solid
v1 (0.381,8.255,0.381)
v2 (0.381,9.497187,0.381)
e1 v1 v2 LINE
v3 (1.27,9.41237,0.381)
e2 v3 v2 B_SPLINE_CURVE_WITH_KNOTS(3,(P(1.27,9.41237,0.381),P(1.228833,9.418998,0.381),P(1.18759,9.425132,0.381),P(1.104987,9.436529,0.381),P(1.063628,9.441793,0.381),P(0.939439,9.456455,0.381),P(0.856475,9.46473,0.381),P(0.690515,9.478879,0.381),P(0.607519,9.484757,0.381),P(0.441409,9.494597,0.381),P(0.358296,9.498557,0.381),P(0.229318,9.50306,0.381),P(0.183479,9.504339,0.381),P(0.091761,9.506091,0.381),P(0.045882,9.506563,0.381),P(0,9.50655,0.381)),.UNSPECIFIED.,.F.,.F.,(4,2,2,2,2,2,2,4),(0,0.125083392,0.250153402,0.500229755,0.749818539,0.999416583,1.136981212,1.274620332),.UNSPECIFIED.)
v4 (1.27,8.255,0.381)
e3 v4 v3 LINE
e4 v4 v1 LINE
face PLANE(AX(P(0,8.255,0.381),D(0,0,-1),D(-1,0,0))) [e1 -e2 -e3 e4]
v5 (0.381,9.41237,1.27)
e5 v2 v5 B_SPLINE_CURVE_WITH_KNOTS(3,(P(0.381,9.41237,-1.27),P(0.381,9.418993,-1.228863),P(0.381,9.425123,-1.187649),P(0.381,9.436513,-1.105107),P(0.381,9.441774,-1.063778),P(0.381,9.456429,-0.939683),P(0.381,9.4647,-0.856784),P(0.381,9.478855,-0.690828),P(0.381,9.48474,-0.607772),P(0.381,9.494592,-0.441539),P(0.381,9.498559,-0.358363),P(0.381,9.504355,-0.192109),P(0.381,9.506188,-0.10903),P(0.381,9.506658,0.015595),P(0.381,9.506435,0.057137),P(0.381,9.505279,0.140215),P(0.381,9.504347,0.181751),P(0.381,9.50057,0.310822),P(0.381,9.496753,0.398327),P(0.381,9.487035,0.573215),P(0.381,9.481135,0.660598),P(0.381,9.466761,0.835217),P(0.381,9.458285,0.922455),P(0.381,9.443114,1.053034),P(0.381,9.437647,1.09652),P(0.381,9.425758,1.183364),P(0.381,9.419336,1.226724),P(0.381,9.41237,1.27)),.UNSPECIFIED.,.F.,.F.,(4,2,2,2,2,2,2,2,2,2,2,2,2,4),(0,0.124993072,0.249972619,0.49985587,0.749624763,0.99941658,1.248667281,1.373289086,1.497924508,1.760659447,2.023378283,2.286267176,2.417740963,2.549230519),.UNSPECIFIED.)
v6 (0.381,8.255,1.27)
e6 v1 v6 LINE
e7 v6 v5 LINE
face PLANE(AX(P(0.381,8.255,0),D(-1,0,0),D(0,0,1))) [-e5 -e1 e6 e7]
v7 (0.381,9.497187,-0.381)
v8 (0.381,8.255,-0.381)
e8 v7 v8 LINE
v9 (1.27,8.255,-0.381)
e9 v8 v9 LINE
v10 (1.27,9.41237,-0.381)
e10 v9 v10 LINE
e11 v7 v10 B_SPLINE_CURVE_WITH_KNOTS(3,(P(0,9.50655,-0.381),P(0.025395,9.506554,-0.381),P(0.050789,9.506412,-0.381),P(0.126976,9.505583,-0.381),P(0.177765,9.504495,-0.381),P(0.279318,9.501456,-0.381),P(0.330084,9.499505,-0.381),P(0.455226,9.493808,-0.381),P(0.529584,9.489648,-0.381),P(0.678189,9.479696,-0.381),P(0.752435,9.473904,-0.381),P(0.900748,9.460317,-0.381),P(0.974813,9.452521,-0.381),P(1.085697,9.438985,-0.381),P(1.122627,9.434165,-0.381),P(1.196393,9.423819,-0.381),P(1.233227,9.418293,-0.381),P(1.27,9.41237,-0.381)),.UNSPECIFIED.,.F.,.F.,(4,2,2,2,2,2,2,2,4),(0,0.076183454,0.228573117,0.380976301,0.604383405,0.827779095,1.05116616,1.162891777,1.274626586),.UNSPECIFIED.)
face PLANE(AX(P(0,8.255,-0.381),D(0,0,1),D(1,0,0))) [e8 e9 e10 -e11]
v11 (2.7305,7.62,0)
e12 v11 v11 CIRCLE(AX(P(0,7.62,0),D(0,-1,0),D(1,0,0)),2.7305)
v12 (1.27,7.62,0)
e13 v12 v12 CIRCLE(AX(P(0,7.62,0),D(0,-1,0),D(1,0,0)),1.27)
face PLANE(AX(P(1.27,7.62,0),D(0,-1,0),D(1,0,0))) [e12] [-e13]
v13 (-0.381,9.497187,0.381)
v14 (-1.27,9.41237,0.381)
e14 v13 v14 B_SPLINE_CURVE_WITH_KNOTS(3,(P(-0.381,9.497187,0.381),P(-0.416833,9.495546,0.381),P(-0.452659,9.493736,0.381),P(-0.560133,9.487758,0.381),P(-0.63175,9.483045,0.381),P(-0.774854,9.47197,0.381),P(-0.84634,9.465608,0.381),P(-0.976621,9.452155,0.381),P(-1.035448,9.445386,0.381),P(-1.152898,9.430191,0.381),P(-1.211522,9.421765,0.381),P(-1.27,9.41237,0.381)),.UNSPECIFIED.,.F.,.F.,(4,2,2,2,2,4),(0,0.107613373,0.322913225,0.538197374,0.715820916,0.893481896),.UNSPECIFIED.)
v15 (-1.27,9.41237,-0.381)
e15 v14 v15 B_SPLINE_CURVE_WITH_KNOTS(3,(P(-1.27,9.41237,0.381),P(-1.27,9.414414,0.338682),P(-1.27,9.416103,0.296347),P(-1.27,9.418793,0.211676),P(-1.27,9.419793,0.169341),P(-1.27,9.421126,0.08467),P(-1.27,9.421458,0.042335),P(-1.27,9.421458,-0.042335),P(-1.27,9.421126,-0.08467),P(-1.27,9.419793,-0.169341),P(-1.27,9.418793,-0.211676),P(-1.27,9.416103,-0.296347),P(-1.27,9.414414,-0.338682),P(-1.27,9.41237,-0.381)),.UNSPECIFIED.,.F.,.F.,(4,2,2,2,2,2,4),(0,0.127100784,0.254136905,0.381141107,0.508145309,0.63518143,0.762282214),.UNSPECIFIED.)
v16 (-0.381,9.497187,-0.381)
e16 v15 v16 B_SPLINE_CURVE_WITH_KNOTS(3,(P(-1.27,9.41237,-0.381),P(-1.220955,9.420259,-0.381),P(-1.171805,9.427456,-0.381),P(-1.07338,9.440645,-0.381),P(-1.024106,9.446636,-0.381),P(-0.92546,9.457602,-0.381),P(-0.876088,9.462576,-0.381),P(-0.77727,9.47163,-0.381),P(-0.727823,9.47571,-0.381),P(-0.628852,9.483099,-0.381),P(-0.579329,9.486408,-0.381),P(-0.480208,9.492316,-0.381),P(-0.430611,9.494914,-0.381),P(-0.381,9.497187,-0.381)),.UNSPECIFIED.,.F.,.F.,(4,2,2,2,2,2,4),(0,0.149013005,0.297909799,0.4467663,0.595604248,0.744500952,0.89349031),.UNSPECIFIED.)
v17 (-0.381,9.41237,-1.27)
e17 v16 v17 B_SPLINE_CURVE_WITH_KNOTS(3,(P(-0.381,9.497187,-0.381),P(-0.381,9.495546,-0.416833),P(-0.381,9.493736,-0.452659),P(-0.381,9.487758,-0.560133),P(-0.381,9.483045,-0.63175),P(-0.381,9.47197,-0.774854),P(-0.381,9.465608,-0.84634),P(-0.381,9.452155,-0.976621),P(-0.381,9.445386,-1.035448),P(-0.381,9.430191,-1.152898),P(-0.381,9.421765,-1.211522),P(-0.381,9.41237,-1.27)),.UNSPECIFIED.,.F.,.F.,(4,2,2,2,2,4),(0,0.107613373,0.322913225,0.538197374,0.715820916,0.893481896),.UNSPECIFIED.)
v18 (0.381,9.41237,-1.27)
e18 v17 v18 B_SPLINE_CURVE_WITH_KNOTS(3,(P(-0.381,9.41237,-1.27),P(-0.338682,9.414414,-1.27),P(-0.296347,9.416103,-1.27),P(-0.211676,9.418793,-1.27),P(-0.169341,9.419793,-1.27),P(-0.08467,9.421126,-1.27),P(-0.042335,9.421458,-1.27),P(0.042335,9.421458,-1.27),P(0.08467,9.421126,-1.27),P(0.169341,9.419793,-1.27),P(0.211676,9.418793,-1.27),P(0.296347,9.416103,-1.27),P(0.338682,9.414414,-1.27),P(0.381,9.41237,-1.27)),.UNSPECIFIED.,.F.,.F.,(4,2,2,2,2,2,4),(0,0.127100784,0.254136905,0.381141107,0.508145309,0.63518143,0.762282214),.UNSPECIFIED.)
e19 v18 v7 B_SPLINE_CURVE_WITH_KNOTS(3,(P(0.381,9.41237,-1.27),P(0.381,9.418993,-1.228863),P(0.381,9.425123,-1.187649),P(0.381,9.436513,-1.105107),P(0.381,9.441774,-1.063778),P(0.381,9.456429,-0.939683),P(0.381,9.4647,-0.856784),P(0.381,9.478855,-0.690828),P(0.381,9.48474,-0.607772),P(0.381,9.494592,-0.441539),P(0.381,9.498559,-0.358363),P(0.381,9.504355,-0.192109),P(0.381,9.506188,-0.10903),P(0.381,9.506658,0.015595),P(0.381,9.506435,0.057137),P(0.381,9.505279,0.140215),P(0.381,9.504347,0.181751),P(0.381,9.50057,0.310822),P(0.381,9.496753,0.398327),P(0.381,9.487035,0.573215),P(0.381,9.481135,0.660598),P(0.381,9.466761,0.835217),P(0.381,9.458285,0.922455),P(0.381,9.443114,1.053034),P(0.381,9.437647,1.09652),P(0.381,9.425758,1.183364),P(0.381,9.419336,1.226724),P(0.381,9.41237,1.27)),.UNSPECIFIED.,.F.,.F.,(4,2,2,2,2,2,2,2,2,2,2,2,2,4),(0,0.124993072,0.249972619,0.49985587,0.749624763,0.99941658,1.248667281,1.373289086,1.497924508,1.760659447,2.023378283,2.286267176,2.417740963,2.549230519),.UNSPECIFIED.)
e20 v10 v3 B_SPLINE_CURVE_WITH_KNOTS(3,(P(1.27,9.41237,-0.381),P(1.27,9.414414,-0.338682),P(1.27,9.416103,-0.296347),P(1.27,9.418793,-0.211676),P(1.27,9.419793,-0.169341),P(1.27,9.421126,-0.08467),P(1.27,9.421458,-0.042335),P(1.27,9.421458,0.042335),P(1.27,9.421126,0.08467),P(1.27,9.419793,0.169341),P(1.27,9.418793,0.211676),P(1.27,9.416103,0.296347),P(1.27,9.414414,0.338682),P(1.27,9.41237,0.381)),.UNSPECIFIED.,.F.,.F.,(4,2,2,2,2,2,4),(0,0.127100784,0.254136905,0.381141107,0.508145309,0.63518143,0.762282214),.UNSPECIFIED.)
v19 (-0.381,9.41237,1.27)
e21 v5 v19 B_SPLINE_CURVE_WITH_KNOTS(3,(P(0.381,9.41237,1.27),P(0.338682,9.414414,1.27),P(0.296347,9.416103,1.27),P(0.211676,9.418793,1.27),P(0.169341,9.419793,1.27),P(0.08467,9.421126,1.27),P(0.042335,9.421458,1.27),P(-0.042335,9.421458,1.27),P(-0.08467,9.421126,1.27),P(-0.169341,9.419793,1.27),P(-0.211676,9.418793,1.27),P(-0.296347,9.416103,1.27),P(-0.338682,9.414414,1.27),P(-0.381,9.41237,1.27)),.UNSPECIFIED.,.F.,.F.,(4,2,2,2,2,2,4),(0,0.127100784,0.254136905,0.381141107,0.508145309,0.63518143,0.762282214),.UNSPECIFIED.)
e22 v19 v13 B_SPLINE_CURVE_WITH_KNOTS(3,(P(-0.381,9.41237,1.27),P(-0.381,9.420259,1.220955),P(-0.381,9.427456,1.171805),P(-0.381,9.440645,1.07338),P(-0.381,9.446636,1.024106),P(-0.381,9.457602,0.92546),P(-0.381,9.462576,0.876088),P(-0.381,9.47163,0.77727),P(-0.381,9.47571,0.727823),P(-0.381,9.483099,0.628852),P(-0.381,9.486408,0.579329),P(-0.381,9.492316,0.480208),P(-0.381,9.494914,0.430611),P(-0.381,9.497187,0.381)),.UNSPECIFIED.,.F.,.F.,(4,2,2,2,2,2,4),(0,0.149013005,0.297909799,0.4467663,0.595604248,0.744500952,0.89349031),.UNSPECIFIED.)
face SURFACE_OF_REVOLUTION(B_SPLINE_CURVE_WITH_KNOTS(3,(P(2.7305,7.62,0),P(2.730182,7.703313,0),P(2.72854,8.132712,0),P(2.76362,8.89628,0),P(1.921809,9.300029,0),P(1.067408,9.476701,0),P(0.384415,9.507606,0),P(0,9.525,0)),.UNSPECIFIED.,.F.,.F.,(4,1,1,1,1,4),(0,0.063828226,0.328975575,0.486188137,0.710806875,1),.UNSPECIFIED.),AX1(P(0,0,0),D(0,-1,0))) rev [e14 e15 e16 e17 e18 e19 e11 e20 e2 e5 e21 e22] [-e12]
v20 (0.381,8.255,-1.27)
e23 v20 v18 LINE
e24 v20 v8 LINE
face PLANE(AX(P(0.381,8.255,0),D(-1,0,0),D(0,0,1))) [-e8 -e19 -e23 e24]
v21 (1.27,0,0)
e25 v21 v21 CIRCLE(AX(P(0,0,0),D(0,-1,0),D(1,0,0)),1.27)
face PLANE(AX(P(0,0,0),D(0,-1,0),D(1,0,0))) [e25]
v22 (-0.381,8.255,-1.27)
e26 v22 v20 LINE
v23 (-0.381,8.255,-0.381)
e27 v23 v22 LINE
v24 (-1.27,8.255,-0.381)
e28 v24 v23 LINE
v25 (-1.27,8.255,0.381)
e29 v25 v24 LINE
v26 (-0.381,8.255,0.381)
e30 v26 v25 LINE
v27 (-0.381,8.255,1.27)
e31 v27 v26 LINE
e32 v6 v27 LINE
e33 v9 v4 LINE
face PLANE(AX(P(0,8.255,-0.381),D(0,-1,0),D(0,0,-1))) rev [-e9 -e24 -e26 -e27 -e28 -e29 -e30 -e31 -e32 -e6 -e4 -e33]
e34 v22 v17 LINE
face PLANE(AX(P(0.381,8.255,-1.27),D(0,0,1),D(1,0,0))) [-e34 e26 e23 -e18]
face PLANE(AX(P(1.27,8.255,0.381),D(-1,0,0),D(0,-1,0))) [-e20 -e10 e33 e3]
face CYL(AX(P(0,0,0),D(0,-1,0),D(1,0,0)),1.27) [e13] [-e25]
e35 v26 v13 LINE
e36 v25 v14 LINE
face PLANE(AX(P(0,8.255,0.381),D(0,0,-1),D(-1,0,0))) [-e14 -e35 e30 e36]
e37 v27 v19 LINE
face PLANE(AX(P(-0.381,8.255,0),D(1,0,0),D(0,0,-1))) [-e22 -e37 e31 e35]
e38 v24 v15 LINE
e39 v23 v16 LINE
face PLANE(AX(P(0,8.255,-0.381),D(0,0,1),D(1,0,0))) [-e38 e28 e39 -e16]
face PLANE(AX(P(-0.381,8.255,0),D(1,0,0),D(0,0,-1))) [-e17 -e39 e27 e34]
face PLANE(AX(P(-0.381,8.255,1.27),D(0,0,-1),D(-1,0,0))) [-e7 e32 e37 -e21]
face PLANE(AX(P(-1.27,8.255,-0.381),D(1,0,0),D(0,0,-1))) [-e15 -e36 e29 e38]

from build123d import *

# Parameters (mm, degrees)
REVOLVE1_OUTLINE_W = 1.27
REVOLVE1_OUTLINE_H = 7.62
SKETCH2_W          = 1.27
SKETCH2_H          = 0.762
CUT_EXTRUDE1_DEPTH = 1.27
CIRPATTERN1_COUNT  = 4


# Read off the part's stored shape, not the designer's step: Revolve1
with BuildPart() as part:
    # Revolve1 outline → Revolve1 (revolve)
    with BuildSketch(Plane.XY):
        with Locations((0.635, 3.81)):
            Rectangle(REVOLVE1_OUTLINE_W, REVOLVE1_OUTLINE_H)
        with BuildLine():
            Line((0, 9.525), (0, 7.62))
            Line((0, 7.62), (1.27, 7.62))
            Line((1.27, 7.62), (1.27, 9.421457579))
            add(Edge.make_bspline(
                [(1.27, 9.421457579), (1.228139819, 9.428026655), (0.811912502, 9.488262021), (0.384414806, 9.507605733), (0, 9.525)],
                knots=[0.678395856, 0.678395856, 0.678395856, 0.678395856, 0.710806875, 1, 1, 1, 1], degree=3))
        make_face()
        with BuildLine():
            Line((1.27, 9.421457579), (1.27, 7.62))
            Line((1.27, 7.62), (2.7305, 7.62))
            add(Edge.make_bspline(
                [(2.7305, 7.62), (2.730181564, 7.703312624), (2.729863127, 7.786625248), (2.7305, 7.873222802)],
                knots=[0, 0, 0, 0, 0.063828226, 0.063828226, 0.063828226, 0.063828226], degree=3))
            Line((2.7305, 7.873222802), (2.7305, 8.214607098))
            add(Edge.make_bspline(
                [(2.7305, 8.214607098), (2.72332571, 8.473946678), (2.657632203, 8.947113323), (1.963979921, 9.279802566), (1.518244272, 9.38250086), (1.27, 9.421457579)],
                knots=[0.145285385, 0.145285385, 0.145285385, 0.145285385, 0.328975575, 0.486188137, 0.678395856, 0.678395856, 0.678395856, 0.678395856], degree=3))
        make_face()
        with BuildLine():
            Line((2.7305, 8.214607098), (2.7305, 7.873222802))
            add(Edge.make_bspline(
                [(2.7305, 7.873222802), (2.731005418, 7.941946006), (2.73211248, 8.012738026), (2.73211248, 8.084105221)],
                knots=[0.063828226, 0.063828226, 0.063828226, 0.063828226, 0.114481853, 0.114481853, 0.114481853, 0.114481853], degree=3))
            add(Edge.make_bspline(
                [(2.73211248, 8.084105221), (2.73211248, 8.127505109), (2.731703077, 8.171117703), (2.7305, 8.214607098)],
                knots=[0.114481853, 0.114481853, 0.114481853, 0.114481853, 0.145285385, 0.145285385, 0.145285385, 0.145285385], degree=3))
        make_face()
    revolve(axis=Axis((0, 0, 0), (0, 1, 0)))

    # Sketch2 → Cut-Extrude1 (cut)
    with BuildSketch(Plane.XZ.offset(-9.525)):
        with Locations((0.635, 0)):
            Rectangle(SKETCH2_W, SKETCH2_H)
    cut_extrude1 = extrude(amount=CUT_EXTRUDE1_DEPTH, mode=Mode.SUBTRACT)

    # CirPattern1: Cut-Extrude1 ×4 about axis
    cirpattern1_axis = Axis((0, 0, 0), (0, 1, 0))
    for i in range(1, CIRPATTERN1_COUNT):
        add(cut_extrude1.rotate(cirpattern1_axis, i * 360 / CIRPATTERN1_COUNT), mode=Mode.SUBTRACT)


solid = part.part
